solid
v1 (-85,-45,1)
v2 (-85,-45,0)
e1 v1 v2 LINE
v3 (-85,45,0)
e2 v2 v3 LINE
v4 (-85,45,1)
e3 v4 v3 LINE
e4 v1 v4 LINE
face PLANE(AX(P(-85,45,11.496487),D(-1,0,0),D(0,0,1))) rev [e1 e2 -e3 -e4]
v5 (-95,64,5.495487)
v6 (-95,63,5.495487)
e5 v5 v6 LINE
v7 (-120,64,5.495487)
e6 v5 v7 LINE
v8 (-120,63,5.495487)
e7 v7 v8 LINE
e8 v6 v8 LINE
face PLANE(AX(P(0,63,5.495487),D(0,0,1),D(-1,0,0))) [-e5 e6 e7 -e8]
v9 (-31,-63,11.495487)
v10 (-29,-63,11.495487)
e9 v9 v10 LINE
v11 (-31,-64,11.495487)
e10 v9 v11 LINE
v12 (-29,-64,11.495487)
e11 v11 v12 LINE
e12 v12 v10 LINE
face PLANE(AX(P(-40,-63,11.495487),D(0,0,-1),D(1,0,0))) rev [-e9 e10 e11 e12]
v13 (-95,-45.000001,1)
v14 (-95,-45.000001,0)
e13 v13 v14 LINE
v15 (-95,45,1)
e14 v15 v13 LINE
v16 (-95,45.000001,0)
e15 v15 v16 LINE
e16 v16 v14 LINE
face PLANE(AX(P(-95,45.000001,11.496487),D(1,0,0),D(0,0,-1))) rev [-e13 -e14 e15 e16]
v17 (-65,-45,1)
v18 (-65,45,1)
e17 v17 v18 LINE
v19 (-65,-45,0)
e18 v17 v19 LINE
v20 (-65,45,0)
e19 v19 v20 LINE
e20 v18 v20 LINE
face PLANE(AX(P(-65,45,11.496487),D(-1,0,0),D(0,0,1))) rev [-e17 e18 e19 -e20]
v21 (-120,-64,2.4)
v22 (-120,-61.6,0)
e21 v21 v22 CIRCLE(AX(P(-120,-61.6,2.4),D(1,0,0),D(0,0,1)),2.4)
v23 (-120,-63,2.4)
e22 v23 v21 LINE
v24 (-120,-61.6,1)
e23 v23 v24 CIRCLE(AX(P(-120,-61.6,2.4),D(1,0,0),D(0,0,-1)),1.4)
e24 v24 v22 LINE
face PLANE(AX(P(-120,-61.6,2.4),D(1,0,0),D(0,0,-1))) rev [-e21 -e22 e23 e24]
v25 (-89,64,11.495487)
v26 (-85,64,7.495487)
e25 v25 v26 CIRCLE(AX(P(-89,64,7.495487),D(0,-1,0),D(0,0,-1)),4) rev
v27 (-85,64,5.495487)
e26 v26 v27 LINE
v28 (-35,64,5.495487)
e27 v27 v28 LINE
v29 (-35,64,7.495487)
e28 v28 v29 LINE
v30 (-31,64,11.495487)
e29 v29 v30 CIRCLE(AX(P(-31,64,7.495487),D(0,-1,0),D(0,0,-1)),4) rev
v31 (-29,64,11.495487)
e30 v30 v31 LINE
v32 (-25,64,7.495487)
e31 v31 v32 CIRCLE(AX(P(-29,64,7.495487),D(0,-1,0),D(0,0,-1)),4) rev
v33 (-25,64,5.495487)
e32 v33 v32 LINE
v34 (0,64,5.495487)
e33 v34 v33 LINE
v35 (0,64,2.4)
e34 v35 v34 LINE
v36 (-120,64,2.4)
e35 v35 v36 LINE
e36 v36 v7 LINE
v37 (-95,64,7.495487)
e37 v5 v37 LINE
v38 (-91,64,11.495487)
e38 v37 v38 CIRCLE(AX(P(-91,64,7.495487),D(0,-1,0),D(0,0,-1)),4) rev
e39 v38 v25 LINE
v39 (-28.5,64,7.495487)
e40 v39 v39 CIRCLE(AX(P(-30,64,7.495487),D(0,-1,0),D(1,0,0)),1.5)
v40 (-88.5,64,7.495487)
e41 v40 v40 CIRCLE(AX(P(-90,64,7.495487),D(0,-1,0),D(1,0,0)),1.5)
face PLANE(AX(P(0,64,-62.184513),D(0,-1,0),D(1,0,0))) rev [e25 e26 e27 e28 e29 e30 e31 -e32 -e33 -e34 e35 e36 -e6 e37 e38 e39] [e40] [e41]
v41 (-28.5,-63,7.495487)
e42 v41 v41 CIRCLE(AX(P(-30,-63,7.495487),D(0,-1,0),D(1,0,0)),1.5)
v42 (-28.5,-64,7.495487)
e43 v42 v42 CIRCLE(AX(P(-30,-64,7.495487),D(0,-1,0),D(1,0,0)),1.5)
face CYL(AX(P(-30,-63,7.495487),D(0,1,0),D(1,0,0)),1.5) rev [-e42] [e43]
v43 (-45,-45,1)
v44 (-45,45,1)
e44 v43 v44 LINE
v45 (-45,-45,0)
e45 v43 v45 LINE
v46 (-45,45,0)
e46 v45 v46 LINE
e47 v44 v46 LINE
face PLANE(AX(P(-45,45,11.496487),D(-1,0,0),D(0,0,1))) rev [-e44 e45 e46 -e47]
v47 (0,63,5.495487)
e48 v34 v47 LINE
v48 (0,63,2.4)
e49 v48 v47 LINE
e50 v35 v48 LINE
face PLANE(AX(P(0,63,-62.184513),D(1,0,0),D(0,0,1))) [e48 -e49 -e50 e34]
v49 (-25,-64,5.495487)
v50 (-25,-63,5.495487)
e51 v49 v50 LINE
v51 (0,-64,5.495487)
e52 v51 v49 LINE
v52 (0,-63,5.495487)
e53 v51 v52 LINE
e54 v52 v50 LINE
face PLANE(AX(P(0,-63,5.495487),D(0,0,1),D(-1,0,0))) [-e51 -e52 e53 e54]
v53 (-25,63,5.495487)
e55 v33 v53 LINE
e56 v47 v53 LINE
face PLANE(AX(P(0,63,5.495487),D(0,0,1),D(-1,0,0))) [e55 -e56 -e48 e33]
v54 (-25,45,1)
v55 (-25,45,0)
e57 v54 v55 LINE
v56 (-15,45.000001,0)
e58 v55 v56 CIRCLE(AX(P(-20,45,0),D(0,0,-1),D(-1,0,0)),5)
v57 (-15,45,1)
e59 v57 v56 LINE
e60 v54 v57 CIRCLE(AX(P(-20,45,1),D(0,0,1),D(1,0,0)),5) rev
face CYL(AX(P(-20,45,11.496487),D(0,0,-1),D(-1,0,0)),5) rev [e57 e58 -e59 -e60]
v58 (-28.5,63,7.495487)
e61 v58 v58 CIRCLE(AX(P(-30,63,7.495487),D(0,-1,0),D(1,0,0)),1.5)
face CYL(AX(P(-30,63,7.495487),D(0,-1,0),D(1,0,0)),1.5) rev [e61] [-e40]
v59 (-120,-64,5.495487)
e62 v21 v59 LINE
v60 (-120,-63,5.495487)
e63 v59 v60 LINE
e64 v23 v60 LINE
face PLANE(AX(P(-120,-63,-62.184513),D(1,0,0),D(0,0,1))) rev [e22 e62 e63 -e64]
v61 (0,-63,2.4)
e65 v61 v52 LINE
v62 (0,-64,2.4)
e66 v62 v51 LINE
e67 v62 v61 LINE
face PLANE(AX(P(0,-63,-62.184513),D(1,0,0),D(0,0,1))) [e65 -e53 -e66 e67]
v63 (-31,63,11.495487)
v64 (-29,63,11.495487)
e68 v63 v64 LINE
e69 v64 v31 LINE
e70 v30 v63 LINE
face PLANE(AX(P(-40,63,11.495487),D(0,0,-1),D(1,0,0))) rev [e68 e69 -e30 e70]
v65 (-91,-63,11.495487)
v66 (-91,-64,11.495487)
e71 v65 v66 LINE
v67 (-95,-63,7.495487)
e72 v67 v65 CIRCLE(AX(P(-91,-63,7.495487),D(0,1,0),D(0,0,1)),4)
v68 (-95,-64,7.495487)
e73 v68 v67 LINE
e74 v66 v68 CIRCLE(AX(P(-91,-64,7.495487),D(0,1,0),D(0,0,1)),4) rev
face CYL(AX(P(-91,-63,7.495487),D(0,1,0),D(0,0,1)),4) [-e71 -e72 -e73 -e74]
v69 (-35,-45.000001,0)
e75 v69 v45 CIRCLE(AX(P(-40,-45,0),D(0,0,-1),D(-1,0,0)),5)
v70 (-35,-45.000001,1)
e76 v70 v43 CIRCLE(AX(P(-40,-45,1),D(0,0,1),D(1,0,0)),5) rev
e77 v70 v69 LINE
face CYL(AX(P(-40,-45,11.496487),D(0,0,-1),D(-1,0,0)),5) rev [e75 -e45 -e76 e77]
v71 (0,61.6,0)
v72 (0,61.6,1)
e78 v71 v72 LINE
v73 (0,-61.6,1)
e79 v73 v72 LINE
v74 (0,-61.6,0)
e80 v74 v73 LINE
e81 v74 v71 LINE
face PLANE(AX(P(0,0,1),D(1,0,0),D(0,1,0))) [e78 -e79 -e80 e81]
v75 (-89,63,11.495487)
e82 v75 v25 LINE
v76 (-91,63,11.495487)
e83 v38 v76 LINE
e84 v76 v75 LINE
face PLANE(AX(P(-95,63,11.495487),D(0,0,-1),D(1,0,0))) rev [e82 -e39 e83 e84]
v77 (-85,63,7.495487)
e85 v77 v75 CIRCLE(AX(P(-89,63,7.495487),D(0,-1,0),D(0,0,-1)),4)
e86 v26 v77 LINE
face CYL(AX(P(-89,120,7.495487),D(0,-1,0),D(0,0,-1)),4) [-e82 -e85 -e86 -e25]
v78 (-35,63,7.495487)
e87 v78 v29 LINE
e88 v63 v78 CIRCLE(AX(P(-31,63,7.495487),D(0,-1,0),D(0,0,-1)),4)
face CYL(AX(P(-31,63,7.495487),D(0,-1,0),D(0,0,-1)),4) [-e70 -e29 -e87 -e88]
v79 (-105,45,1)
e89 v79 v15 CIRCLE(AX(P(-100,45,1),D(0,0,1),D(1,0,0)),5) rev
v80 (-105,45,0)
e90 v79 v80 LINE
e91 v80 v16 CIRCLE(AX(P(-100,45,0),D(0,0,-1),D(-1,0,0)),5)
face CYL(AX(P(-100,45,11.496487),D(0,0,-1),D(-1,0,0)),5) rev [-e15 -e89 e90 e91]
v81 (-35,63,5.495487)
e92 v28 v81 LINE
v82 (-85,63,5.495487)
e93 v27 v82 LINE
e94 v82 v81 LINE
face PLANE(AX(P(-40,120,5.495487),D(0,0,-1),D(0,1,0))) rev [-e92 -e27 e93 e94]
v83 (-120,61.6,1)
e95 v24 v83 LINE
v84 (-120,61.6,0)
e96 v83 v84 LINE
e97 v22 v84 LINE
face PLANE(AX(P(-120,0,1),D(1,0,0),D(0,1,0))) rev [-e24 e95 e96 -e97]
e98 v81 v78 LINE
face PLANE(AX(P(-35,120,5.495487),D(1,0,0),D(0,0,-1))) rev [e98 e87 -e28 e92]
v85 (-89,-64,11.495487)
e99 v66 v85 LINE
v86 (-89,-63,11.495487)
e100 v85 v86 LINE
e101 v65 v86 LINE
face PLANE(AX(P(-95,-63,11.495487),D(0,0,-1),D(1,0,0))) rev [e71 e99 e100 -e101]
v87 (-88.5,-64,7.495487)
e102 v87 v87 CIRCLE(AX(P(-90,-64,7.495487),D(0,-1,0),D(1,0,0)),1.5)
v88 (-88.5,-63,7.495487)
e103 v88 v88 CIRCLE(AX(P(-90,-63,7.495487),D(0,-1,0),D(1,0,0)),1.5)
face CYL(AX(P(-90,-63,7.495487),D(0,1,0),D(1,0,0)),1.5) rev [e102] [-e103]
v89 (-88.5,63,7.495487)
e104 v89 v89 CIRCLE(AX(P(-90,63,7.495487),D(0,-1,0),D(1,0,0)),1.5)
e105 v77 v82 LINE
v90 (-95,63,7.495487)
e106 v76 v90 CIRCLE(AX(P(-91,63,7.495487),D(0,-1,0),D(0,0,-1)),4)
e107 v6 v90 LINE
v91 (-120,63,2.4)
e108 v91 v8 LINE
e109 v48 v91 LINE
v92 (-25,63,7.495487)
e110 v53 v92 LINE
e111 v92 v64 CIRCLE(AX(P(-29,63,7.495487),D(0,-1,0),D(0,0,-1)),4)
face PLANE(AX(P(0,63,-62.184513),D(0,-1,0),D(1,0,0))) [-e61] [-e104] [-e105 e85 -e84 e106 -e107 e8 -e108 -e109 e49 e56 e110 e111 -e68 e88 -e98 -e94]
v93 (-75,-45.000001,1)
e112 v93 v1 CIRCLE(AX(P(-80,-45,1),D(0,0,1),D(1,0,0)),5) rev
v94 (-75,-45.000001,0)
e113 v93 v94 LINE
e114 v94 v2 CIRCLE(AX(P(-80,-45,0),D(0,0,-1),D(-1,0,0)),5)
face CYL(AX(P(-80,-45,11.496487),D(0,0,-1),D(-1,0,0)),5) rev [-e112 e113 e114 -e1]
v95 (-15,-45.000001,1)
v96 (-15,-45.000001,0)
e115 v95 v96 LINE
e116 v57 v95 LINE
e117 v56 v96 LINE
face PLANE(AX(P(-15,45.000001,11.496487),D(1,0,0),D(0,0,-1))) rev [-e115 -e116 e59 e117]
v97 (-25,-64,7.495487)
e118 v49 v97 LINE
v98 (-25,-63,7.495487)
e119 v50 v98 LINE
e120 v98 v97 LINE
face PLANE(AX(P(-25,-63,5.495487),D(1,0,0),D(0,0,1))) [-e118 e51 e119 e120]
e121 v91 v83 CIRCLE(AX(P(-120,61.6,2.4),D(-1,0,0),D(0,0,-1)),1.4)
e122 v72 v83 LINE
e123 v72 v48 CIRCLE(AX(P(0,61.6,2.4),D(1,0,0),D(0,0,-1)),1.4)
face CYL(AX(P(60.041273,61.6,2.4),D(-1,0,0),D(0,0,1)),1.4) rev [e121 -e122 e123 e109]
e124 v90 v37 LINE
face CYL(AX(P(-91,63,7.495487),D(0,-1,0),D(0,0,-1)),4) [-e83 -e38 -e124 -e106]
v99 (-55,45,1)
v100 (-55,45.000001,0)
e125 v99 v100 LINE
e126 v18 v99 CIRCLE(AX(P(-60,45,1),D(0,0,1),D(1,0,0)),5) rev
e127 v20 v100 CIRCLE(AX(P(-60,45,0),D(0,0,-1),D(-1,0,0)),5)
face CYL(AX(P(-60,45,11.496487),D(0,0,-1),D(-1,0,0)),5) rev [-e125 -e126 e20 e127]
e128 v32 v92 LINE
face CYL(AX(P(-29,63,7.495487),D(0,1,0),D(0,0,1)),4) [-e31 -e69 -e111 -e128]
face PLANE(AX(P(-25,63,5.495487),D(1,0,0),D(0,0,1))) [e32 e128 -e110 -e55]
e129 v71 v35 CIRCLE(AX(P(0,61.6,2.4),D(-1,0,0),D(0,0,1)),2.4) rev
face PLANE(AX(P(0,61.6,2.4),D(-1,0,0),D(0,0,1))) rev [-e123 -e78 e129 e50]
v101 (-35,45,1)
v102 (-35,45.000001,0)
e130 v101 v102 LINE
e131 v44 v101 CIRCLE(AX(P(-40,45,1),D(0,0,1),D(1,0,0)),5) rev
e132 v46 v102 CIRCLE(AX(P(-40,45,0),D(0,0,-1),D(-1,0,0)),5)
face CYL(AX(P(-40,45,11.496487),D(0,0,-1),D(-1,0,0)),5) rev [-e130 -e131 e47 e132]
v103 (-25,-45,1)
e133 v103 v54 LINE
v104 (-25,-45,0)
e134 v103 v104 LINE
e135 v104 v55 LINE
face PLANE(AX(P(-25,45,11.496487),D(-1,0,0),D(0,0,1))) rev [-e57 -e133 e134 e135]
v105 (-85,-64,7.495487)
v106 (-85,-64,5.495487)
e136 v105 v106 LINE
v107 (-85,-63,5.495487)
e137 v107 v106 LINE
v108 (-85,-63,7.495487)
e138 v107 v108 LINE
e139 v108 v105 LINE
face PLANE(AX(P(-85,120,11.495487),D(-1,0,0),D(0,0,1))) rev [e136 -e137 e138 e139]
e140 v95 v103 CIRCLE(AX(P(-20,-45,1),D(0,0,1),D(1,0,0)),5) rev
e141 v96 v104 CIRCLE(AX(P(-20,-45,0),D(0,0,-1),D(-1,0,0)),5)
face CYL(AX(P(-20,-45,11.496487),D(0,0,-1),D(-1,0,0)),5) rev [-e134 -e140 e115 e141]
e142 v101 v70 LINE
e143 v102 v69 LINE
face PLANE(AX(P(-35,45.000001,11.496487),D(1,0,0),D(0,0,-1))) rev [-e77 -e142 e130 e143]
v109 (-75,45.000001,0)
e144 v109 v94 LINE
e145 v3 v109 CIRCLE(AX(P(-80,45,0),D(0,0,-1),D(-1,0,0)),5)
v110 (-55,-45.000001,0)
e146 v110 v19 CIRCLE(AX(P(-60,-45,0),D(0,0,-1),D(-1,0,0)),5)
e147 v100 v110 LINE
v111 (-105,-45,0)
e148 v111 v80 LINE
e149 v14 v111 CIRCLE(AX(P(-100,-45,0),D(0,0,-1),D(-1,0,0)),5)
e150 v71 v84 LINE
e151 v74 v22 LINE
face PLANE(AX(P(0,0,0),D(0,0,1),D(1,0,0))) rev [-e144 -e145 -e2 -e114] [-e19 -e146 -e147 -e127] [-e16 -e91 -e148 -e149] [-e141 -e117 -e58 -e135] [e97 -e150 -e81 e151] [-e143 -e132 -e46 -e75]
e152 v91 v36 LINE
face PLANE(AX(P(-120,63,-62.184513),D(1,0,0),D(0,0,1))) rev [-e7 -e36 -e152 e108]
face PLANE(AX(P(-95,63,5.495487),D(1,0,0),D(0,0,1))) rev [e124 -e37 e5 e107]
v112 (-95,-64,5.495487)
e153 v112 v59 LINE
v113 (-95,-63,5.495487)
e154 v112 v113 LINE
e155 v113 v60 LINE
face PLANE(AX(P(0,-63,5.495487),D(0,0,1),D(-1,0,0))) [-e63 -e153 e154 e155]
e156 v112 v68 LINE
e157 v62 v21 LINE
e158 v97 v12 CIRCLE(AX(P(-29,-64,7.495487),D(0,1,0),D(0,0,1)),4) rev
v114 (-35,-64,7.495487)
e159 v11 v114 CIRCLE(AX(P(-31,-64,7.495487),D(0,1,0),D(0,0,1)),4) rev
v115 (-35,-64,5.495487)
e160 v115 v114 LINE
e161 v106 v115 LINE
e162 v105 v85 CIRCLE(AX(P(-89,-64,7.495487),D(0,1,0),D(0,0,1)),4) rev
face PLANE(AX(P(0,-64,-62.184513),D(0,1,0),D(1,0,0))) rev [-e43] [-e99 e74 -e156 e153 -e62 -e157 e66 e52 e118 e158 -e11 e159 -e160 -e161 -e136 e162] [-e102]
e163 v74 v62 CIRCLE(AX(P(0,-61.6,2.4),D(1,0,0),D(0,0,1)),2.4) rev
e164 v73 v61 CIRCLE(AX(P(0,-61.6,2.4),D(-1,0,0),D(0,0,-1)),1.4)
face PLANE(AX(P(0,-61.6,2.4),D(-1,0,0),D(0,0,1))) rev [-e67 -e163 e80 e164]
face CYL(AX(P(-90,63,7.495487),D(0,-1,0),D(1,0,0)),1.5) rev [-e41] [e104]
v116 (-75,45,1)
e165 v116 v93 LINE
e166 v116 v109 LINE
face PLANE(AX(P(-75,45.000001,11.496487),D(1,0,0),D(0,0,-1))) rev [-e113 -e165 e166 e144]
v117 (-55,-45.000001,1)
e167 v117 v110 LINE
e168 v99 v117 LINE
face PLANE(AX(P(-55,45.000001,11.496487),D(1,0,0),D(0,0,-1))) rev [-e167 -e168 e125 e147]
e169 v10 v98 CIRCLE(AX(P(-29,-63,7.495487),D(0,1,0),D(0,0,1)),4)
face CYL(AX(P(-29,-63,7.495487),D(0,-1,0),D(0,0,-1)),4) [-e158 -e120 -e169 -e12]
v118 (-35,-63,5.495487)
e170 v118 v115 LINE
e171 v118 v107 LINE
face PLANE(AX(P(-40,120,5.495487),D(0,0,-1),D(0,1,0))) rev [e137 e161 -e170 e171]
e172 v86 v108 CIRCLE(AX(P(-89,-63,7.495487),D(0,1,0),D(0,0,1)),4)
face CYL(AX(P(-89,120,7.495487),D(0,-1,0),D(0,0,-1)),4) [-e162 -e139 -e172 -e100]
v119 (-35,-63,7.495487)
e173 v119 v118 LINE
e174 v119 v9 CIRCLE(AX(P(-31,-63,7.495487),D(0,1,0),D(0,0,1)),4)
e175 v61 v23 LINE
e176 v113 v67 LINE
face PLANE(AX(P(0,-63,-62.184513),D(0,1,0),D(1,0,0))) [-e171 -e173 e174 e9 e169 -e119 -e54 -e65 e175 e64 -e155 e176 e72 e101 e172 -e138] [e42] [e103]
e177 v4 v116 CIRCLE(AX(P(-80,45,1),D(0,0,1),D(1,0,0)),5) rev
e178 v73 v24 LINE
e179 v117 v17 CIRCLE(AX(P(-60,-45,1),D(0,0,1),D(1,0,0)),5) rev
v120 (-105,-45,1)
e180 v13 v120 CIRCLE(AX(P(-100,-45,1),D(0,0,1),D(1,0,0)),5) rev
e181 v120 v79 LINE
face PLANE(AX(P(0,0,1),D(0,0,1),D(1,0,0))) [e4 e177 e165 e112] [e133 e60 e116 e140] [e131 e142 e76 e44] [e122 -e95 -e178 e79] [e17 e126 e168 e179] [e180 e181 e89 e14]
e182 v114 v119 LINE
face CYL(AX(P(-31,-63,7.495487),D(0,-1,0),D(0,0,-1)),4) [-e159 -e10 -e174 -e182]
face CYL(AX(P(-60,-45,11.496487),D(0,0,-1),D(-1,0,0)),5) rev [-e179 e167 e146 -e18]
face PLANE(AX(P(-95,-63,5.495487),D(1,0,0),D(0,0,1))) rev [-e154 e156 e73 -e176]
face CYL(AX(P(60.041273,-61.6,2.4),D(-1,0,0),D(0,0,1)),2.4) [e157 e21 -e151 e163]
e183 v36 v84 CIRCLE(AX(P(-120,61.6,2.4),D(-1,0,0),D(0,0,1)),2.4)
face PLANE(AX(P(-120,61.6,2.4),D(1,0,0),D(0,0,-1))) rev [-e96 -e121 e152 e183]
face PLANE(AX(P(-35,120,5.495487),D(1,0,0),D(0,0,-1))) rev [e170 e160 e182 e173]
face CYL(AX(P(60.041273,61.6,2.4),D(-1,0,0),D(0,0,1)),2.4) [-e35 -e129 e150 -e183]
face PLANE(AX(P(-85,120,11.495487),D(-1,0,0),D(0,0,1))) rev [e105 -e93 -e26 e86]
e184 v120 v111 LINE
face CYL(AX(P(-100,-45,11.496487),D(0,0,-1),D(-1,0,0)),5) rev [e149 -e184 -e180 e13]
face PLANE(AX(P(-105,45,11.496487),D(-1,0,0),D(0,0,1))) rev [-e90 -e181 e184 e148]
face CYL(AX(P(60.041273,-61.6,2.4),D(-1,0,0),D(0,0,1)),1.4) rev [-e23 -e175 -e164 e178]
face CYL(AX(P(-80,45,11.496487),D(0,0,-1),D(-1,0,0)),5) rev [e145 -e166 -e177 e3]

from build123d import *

# Parameters (mm, degrees)
CROQUIS1_W                      = 64
CROQUIS1_H                      = 120
CROQUIS1_R                      = 1.5
CROQUIS1_W_2                    = 2
CROQUIS1_H_2                    = 40
SALIENTE_EXTRUIR1_DEPTH         = 1
PLIEGUE_START                   = 63.746512
PLIEGUE_CROQUIZADO1_OUTLINE_W   = 120
PLIEGUE_CROQUIZADO1_OUTLINE_H   = 1
PLIEGUE_CROQUIZADO1_DEPTH       = 9.933488
PLIEGUE_START_2                 = 62.786512
PLIEGUE_CROQUIZADO1_2_OUTLINE_R = 1.5
PLIEGUE_CROQUIZADO1_2_DEPTH     = 1.213488
PLIEGUE_START_3                 = -121
PLIEGUE_CROQUIZADO1_3_DEPTH     = 122
PLIEGUE_START_4                 = -120
PLIEGUE_CROQUIZADO1_4_DEPTH     = 120
CORTAR_EXTRUIR1_REACH           = 138.485
CORTAR_EXTRUIR2_DEPTH           = 184
REDONDEO1_R                     = 4


with BuildPart() as part:
    # Croquis1 → Saliente-Extruir1 (new body)
    # profile 1 of 5: a face of its own
    with BuildSketch(Plane(origin=(0, 0, 0), x_dir=(0, 1, 0), z_dir=(0, 0, 1))):
        with Locations((32, 60)):
            Rectangle(CROQUIS1_W, CROQUIS1_H)
    # profile 2 of 5: a face of its own
    with BuildSketch(Plane(origin=(0, 0, 0), x_dir=(0, 1, 0), z_dir=(0, 0, 1))):
        Polygon((64, 120), (64, 0), (67.68, 0), (67.68, 25), (67.68, 40), (67.68, 80), (67.68, 95), (67.68, 120), align=None)
    # profile 3 of 5: a face of its own
    with BuildSketch(Plane(origin=(0, 0, 0), x_dir=(0, 1, 0), z_dir=(0, 0, 1))):
        Polygon((67.68, 40), (67.68, 25), (73.68, 25), (73.68, 40), (69.68, 40), align=None)
        with Locations(Location((69.68, 30, 0), (0, 0, 270))):
            Circle(CROQUIS1_R, mode=Mode.SUBTRACT)
    # profile 4 of 5: a face of its own
    with BuildSketch(Plane(origin=(0, 0, 0), x_dir=(0, 1, 0), z_dir=(0, 0, 1))):
        Polygon((73.68, 95), (67.68, 95), (67.68, 80), (69.68, 80), (73.68, 80), align=None)
        with Locations(Location((69.68, 90, 0), (0, 0, 270))):
            Circle(CROQUIS1_R, mode=Mode.SUBTRACT)
    # profile 5 of 5: a face of its own
    with BuildSketch(Plane(origin=(0, 0, 0), x_dir=(0, 1, 0), z_dir=(0, 0, 1))):
        with Locations((68.68, 60)):
            Rectangle(CROQUIS1_W_2, CROQUIS1_H_2)
    extrude(amount=SALIENTE_EXTRUIR1_DEPTH)

    # Pliegue croquizado1: read off the stored shape, not the designer's step
    # Pliegue croquizado1 outline → Pliegue croquizado1 (cut)
    with BuildSketch(Plane(origin=(0, 0, 0), x_dir=(1, 0, 0), z_dir=(0, 1, 0)).offset(PLIEGUE_START)):
        with Locations((-60, -0.5)):
            Rectangle(PLIEGUE_CROQUIZADO1_OUTLINE_W, PLIEGUE_CROQUIZADO1_OUTLINE_H)
    extrude(amount=PLIEGUE_CROQUIZADO1_DEPTH, mode=Mode.SUBTRACT)

    # Pliegue croquizado1 2 outline → Pliegue croquizado1 2 (add)
    with BuildSketch(Plane(origin=(0, 0, 0), x_dir=(1, 0, 0), z_dir=(0, 1, 0)).offset(PLIEGUE_START_2)):
        Polygon((-95, -11.495486979), (-80, -11.495486979), (-80, -7.495486979), (-40, -7.495486979), (-40, -11.495486979), (-25, -11.495486979), (-25, -5.495486979), (0, -5.495486979), (0, -1), (-120, -1), (-120, -5.495486979), (-95, -5.495486979), align=None)
        with Locations((-90, -7.495486979)):
            Circle(PLIEGUE_CROQUIZADO1_2_OUTLINE_R, mode=Mode.SUBTRACT)
        with Locations((-30, -7.495486979)):
            Circle(PLIEGUE_CROQUIZADO1_2_OUTLINE_R, mode=Mode.SUBTRACT)
    extrude(amount=PLIEGUE_CROQUIZADO1_2_DEPTH)

    # Pliegue croquizado1 3 outline → Pliegue croquizado1 3 (cut)
    with BuildSketch(Plane.YZ.offset(PLIEGUE_START_3)):
        with BuildLine():
            Line((63, 11.495486979), (62.786512, 11.495486979))
            Line((62.786512, 11.495486979), (62.786512, 1.656905608))
            ThreePointArc((62.786512, 1.656905608), (62.945569917, 2.013423228), (63, 2.4))
            Line((63, 2.4), (63, 11.495486979))
        make_face()
        with BuildLine():
            Line((64, 1), (64, 2.4))
            ThreePointArc((64, 2.4), (63.297056275, 0.702943725), (61.6, 0))
            Line((61.6, 0), (63.746512, 0))
            Line((63.746512, 0), (63.746512, 1))
            Line((63.746512, 1), (64, 1))
        make_face()
    extrude(amount=PLIEGUE_CROQUIZADO1_3_DEPTH, mode=Mode.SUBTRACT)

    # Pliegue croquizado1 4 outline → Pliegue croquizado1 4 (add)
    with BuildSketch(Plane.YZ.offset(PLIEGUE_START_4)):
        with BuildLine():
            Line((62.786512, 1), (62.786512, 1.656905608))
            ThreePointArc((62.786512, 1.656905608), (62.278110556, 1.175187331), (61.6, 1))
            Line((61.6, 1), (62.786512, 1))
        make_face()
    extrude(amount=PLIEGUE_CROQUIZADO1_4_DEPTH)

    # Simetría1: part across plane


with BuildPart() as part_1:
    add(part.part)
    add(part.part.mirror(Plane(origin=(0, 0, 1), x_dir=(0, 0, 1), z_dir=(0, 1, 0))))

    # Croquis7 → Cortar-Extruir1 (cut, up to next)
    with BuildSketch(Plane(origin=(0, 0, 0), x_dir=(-1, 0, 0), z_dir=(0, 0, -1)), mode=Mode.PRIVATE) as cortar_extruir1_sk1:
        with BuildLine():
            Line((35, 45.000000776), (35, -45.000000776))
            ThreePointArc((35, -45.000000776), (40.000000388, -50), (45, -45))
            Line((45, -45), (45, 45))
            ThreePointArc((45, 45), (40.000000388, 50), (35, 45.000000776))
        make_face()
    cortar_extruir1_tool1 = extrude(cortar_extruir1_sk1.sketch, amount=-CORTAR_EXTRUIR1_REACH, mode=Mode.PRIVATE) & part_1.part
    # Croquis7 → Cortar-Extruir1 (cut, up to next)
    with BuildSketch(Plane(origin=(0, 0, 0), x_dir=(-1, 0, 0), z_dir=(0, 0, -1)), mode=Mode.PRIVATE) as cortar_extruir1_sk2:
        with BuildLine():
            Line((15, 45.000000776), (15, -45.000000776))
            ThreePointArc((15, -45.000000776), (20.000000388, -50), (25, -45))
            Line((25, -45), (25, 45))
            ThreePointArc((25, 45), (20.000000388, 50), (15, 45.000000776))
        make_face()
    cortar_extruir1_tool2 = extrude(cortar_extruir1_sk2.sketch, amount=-CORTAR_EXTRUIR1_REACH, mode=Mode.PRIVATE) & part_1.part
    # Croquis7 → Cortar-Extruir1 (cut, up to next)
    with BuildSketch(Plane(origin=(0, 0, 0), x_dir=(-1, 0, 0), z_dir=(0, 0, -1)), mode=Mode.PRIVATE) as cortar_extruir1_sk3:
        with BuildLine():
            Line((55, 45.000000776), (55, -45.000000776))
            ThreePointArc((55, -45.000000776), (60.000000388, -50), (65, -45))
            Line((65, -45), (65, 45))
            ThreePointArc((65, 45), (60.000000388, 50), (55, 45.000000776))
        make_face()
    cortar_extruir1_tool3 = extrude(cortar_extruir1_sk3.sketch, amount=-CORTAR_EXTRUIR1_REACH, mode=Mode.PRIVATE) & part_1.part
    # Croquis7 → Cortar-Extruir1 (cut, up to next)
    with BuildSketch(Plane(origin=(0, 0, 0), x_dir=(-1, 0, 0), z_dir=(0, 0, -1)), mode=Mode.PRIVATE) as cortar_extruir1_sk4:
        with BuildLine():
            Line((75, 45.000000776), (75, -45.000000776))
            ThreePointArc((75, -45.000000776), (80.000000388, -50), (85, -45))
            Line((85, -45), (85, 45))
            ThreePointArc((85, 45), (80.000000388, 50), (75, 45.000000776))
        make_face()
    cortar_extruir1_tool4 = extrude(cortar_extruir1_sk4.sketch, amount=-CORTAR_EXTRUIR1_REACH, mode=Mode.PRIVATE) & part_1.part
    # Croquis7 → Cortar-Extruir1 (cut, up to next)
    with BuildSketch(Plane(origin=(0, 0, 0), x_dir=(-1, 0, 0), z_dir=(0, 0, -1)), mode=Mode.PRIVATE) as cortar_extruir1_sk5:
        with BuildLine():
            Line((95, 45.000000776), (95, -45.000000776))
            ThreePointArc((95, -45.000000776), (100.000000388, -50), (105, -45))
            Line((105, -45), (105, 45))
            ThreePointArc((105, 45), (100.000000388, 50), (95, 45.000000776))
        make_face()
    cortar_extruir1_tool5 = extrude(cortar_extruir1_sk5.sketch, amount=-CORTAR_EXTRUIR1_REACH, mode=Mode.PRIVATE) & part_1.part
    add(cortar_extruir1_tool1.solids().sort_by_distance((-40, 0, 0))[0], mode=Mode.SUBTRACT)
    add(cortar_extruir1_tool2.solids().sort_by_distance((-20, 0, 0))[0], mode=Mode.SUBTRACT)
    add(cortar_extruir1_tool3.solids().sort_by_distance((-60, 0, 0))[0], mode=Mode.SUBTRACT)
    add(cortar_extruir1_tool4.solids().sort_by_distance((-80, 0, 0))[0], mode=Mode.SUBTRACT)
    add(cortar_extruir1_tool5.solids().sort_by_distance((-100, 0, 0))[0], mode=Mode.SUBTRACT)

    # Croquis8 → Cortar-Extruir2 (cut)
    with BuildSketch(Plane.XZ.offset(64)):
        Polygon((-80, 11.495486979), (-85, 11.495486979), (-85, 5.495486979), (-80, 5.495486979), (-40, 5.495486979), (-35, 5.495486979), (-35, 11.495486979), (-40, 11.495486979), (-40, 7.495486979), (-80, 7.495486979), align=None)
    extrude(amount=-CORTAR_EXTRUIR2_DEPTH, mode=Mode.SUBTRACT)

    # Redondeo1
    redondeo1_edges = [part_1.edges().sort_by_distance(p)[0] for p in [
        (-95, -63.5, 11.495486979),
        (-25, -63.5, 11.495486979),
        (-25, 63.5, 11.495486979),
        (-95, 63.5, 11.495486979),
        (-35, 63.5, 11.495486979),
        (-85, 63.5, 11.495486979),
        (-35, -63.5, 11.495486979),
        (-85, -63.5, 11.495486979),
    ]]
    fillet(redondeo1_edges, radius=REDONDEO1_R)


solid = part_1.part
